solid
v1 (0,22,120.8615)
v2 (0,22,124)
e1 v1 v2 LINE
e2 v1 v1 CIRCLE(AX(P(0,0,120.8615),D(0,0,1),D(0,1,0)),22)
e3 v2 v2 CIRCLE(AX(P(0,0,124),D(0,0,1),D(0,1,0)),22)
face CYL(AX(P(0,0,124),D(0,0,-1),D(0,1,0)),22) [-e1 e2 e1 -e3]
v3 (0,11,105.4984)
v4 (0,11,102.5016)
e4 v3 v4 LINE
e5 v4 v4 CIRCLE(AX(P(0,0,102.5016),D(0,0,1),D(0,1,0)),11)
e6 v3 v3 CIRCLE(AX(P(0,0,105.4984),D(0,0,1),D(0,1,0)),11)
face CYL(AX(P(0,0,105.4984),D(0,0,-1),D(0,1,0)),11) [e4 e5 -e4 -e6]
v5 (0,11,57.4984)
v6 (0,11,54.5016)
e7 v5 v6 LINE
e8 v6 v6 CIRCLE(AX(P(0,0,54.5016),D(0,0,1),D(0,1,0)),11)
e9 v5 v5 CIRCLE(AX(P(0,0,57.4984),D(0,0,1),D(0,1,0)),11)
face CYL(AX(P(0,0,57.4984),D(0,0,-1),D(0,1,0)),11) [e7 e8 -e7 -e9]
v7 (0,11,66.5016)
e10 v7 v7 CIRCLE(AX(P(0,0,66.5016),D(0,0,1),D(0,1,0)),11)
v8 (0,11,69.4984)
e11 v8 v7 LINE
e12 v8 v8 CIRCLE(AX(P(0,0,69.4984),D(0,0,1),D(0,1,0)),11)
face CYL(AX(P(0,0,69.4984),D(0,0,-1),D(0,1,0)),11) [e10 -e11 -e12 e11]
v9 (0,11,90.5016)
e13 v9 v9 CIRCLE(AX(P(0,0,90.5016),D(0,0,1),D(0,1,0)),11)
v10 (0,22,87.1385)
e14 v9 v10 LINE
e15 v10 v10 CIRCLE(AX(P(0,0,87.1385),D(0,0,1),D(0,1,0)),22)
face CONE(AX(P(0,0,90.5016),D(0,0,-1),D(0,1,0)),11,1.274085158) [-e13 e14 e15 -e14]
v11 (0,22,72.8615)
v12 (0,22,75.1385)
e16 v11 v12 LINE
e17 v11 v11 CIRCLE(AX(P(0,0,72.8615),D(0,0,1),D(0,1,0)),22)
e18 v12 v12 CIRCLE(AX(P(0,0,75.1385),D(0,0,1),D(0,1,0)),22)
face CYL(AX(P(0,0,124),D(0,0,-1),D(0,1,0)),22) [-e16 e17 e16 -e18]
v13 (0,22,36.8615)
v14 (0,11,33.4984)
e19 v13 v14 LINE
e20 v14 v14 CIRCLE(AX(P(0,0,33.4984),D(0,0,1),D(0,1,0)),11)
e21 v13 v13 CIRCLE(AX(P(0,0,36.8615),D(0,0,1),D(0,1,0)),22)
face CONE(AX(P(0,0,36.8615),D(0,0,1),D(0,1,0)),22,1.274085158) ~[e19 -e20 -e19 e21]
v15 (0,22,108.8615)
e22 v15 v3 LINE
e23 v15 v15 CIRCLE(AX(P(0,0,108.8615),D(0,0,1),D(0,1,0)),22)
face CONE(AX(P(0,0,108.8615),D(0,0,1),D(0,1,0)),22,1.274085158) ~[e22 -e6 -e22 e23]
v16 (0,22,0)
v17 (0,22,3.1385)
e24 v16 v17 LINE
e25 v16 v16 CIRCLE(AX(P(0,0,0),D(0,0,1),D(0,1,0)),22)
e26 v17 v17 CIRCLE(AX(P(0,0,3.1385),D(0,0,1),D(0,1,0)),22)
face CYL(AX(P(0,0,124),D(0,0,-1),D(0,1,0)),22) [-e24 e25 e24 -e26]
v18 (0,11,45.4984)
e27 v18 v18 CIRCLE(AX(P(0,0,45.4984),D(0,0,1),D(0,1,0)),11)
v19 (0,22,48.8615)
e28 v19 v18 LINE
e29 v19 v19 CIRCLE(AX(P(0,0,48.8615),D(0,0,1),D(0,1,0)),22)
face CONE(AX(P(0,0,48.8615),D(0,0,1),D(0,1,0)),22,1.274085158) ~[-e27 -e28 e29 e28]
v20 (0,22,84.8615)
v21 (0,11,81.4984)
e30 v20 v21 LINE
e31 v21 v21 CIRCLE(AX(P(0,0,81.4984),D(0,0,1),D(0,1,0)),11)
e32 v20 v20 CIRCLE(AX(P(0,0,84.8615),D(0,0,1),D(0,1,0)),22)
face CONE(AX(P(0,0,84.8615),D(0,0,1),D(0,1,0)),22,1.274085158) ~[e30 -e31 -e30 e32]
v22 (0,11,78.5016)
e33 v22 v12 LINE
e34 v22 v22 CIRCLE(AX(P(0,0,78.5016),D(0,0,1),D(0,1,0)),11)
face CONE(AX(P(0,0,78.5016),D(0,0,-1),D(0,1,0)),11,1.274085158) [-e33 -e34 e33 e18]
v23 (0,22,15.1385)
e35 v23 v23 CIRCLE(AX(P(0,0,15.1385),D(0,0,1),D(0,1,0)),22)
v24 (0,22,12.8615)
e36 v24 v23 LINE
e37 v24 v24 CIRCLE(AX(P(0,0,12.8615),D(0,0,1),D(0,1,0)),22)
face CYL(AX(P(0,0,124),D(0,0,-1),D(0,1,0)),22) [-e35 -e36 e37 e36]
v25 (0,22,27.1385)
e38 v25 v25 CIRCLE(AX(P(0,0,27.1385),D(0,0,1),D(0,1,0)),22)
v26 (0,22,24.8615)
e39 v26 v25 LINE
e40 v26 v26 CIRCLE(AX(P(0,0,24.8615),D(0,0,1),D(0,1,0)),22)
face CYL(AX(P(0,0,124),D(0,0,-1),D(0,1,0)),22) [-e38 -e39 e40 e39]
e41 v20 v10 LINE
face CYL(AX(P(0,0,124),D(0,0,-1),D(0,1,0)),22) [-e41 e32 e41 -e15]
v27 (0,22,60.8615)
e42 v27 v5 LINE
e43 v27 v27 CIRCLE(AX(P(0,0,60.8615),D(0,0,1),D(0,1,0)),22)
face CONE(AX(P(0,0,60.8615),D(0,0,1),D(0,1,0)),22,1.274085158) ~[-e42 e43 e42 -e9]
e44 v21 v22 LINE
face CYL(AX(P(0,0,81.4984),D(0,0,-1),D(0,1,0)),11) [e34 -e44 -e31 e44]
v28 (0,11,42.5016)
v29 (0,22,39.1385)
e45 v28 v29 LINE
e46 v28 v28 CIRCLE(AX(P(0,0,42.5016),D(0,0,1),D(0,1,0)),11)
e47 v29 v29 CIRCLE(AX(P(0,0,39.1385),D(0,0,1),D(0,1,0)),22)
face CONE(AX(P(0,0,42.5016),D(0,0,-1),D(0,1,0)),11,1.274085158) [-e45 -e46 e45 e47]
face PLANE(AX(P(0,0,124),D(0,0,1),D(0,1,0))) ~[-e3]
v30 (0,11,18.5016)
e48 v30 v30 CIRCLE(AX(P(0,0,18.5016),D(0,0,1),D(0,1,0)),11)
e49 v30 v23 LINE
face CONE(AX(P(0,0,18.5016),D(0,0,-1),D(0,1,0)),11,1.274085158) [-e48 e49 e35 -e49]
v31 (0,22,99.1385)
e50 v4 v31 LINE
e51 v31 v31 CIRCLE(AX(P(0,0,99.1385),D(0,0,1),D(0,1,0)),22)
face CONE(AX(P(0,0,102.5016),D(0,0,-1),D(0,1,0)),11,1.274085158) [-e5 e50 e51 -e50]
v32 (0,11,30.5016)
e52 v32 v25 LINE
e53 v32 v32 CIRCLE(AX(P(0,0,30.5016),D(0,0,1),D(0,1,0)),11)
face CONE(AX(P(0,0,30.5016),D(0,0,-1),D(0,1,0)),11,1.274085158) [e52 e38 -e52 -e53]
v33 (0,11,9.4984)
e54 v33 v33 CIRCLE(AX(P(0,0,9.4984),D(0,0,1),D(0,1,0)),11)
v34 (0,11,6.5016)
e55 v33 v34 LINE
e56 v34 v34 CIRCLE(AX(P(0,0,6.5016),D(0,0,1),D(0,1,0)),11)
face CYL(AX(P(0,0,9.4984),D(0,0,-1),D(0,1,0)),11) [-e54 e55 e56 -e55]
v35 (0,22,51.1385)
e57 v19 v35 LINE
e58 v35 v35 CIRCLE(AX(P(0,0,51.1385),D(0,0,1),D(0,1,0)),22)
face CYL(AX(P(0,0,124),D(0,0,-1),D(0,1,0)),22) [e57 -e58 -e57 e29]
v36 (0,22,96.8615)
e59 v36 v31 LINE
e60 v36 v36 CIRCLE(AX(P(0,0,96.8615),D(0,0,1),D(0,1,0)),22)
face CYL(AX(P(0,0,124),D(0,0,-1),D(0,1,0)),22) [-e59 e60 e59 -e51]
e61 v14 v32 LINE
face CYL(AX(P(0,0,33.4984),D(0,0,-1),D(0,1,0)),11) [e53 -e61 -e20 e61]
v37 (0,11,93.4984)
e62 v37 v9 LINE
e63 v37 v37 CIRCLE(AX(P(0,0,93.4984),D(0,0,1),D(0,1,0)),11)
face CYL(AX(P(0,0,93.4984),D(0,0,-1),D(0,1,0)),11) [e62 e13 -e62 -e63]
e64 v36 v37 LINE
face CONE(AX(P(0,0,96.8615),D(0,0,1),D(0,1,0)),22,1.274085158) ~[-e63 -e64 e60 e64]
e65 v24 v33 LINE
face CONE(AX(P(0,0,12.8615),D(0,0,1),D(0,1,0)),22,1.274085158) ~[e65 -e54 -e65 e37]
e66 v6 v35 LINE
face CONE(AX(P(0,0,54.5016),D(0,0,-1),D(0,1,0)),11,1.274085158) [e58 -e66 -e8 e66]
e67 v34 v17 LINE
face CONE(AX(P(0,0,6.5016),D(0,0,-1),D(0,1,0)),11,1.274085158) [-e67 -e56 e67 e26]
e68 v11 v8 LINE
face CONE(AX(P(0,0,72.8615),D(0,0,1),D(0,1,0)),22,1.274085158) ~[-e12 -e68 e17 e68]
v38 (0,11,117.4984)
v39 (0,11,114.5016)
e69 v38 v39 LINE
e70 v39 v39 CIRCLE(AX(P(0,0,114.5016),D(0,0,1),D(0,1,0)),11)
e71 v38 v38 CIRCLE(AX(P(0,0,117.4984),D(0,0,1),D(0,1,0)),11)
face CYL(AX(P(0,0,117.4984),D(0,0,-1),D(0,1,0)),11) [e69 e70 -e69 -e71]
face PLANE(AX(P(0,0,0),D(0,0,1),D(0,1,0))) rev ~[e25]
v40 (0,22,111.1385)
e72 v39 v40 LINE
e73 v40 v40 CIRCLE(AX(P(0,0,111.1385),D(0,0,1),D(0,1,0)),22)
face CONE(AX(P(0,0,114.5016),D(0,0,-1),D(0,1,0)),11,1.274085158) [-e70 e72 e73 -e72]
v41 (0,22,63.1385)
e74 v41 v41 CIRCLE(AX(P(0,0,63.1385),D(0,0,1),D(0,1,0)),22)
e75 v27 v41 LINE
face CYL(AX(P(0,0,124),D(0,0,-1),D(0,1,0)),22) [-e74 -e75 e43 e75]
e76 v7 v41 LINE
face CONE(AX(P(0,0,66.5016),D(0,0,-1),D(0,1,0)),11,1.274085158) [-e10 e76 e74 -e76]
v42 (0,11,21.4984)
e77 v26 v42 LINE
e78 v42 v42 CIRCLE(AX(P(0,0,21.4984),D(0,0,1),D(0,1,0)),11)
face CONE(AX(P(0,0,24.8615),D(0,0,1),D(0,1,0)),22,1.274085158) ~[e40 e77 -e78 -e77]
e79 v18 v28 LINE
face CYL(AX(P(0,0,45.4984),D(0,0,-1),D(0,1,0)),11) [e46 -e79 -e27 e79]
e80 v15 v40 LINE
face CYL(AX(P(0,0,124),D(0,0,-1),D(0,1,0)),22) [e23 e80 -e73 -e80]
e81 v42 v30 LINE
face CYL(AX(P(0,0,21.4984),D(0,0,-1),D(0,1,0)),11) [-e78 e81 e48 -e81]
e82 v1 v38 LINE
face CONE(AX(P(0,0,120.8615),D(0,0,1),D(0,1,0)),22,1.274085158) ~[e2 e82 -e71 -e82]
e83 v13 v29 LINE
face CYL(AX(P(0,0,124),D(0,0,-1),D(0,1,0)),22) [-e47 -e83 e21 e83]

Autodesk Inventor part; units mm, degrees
ref_plane "YZ Plane" through (0, 0, 0) normal (1, 0, 0) x (0, 1, 0)
ref_plane "XZ Plane" through (0, 0, 0) normal (0, 1, 0) x (-1, 0, 0)
sketch "Main Sketch" plane through (0, 0, 0) normal (1, 0, 0) x (0, 1, 0)
  line L0 (0, 124) -> (22, 124)
  line L1 (22, 124) -> (22, 12.8615)
  line L2 (22, 12.8615) -> (11, 9.4984)
  line L3 (11, 9.4984) -> (11, 6.5016)
  line L4 (11, 6.5016) -> (22, 3.1385)
  line L5 (22, 3.1385) -> (22, 0)
  line L6 (22, 0) -> (0, 0)
  line L7 (20, 12.25) -> (20, 3.75) construction
  line L8 (11, 8) -> (20, 8) construction
  line L9 (22, 12.8615) -> (22, 3.1385)
  line L10 (0, -4) -> (0, 24) projected
  line L11 (0, 0) -> (0, 124)
  dimension "d0" = 8.5
  dimension "d1" = 34
  dimension "d2" = 2
  dimension "d6" = 124
  dimension "d21" = 40
  dimension "d25" = 11
  dimension "d27" = 8
ref_plane "Belt Plane" through (0, 11, 8) normal (0, 0, 1) x (1, 0, 0)
revolve "Body" add sketch "Main Sketch" angle 360 about axis through (0, 0, -10) along (0, 0, 1)
revolve "Groove" cut sketch "Main Sketch" angle 360 about axis through (0, 0, -10) along (0, 0, 1) contours L9 L4 L3 L2
fillet "Fillet External" [suppressed]
fillet "Fillet Internal" [suppressed]
pattern_linear "Groove Pattern" count 10 spacing 12 along (0, 0, 1) of "Groove"
equation "\"d0\" = da_Bw"
equation "\"d1\" = da_Alfa"
equation "\"d2\" = da_c"
equation "\"d21\" = da_Dw"
equation "\"d25\" = da_Hd"
equation "\"d27\" = da_Se"
equation "\"da_r1\" = 0"
equation "\"da_r2\" = 0"
equation "\"d18\" = da_Sg"
equation "\"d5\" = da_Se"
equation "\"da_Bw\" = 8.5"
equation "\"da_Alfa\" = 34deg"
equation "\"da_c\" = 2"
equation "\"da_Dw\" = 40"
equation "\"da_Hd\" = 11"
equation "\"da_Se\" = 8"
equation "\"da_Sg\" = 12"
properties part number "Grooved Pulley2" material "Steel"
